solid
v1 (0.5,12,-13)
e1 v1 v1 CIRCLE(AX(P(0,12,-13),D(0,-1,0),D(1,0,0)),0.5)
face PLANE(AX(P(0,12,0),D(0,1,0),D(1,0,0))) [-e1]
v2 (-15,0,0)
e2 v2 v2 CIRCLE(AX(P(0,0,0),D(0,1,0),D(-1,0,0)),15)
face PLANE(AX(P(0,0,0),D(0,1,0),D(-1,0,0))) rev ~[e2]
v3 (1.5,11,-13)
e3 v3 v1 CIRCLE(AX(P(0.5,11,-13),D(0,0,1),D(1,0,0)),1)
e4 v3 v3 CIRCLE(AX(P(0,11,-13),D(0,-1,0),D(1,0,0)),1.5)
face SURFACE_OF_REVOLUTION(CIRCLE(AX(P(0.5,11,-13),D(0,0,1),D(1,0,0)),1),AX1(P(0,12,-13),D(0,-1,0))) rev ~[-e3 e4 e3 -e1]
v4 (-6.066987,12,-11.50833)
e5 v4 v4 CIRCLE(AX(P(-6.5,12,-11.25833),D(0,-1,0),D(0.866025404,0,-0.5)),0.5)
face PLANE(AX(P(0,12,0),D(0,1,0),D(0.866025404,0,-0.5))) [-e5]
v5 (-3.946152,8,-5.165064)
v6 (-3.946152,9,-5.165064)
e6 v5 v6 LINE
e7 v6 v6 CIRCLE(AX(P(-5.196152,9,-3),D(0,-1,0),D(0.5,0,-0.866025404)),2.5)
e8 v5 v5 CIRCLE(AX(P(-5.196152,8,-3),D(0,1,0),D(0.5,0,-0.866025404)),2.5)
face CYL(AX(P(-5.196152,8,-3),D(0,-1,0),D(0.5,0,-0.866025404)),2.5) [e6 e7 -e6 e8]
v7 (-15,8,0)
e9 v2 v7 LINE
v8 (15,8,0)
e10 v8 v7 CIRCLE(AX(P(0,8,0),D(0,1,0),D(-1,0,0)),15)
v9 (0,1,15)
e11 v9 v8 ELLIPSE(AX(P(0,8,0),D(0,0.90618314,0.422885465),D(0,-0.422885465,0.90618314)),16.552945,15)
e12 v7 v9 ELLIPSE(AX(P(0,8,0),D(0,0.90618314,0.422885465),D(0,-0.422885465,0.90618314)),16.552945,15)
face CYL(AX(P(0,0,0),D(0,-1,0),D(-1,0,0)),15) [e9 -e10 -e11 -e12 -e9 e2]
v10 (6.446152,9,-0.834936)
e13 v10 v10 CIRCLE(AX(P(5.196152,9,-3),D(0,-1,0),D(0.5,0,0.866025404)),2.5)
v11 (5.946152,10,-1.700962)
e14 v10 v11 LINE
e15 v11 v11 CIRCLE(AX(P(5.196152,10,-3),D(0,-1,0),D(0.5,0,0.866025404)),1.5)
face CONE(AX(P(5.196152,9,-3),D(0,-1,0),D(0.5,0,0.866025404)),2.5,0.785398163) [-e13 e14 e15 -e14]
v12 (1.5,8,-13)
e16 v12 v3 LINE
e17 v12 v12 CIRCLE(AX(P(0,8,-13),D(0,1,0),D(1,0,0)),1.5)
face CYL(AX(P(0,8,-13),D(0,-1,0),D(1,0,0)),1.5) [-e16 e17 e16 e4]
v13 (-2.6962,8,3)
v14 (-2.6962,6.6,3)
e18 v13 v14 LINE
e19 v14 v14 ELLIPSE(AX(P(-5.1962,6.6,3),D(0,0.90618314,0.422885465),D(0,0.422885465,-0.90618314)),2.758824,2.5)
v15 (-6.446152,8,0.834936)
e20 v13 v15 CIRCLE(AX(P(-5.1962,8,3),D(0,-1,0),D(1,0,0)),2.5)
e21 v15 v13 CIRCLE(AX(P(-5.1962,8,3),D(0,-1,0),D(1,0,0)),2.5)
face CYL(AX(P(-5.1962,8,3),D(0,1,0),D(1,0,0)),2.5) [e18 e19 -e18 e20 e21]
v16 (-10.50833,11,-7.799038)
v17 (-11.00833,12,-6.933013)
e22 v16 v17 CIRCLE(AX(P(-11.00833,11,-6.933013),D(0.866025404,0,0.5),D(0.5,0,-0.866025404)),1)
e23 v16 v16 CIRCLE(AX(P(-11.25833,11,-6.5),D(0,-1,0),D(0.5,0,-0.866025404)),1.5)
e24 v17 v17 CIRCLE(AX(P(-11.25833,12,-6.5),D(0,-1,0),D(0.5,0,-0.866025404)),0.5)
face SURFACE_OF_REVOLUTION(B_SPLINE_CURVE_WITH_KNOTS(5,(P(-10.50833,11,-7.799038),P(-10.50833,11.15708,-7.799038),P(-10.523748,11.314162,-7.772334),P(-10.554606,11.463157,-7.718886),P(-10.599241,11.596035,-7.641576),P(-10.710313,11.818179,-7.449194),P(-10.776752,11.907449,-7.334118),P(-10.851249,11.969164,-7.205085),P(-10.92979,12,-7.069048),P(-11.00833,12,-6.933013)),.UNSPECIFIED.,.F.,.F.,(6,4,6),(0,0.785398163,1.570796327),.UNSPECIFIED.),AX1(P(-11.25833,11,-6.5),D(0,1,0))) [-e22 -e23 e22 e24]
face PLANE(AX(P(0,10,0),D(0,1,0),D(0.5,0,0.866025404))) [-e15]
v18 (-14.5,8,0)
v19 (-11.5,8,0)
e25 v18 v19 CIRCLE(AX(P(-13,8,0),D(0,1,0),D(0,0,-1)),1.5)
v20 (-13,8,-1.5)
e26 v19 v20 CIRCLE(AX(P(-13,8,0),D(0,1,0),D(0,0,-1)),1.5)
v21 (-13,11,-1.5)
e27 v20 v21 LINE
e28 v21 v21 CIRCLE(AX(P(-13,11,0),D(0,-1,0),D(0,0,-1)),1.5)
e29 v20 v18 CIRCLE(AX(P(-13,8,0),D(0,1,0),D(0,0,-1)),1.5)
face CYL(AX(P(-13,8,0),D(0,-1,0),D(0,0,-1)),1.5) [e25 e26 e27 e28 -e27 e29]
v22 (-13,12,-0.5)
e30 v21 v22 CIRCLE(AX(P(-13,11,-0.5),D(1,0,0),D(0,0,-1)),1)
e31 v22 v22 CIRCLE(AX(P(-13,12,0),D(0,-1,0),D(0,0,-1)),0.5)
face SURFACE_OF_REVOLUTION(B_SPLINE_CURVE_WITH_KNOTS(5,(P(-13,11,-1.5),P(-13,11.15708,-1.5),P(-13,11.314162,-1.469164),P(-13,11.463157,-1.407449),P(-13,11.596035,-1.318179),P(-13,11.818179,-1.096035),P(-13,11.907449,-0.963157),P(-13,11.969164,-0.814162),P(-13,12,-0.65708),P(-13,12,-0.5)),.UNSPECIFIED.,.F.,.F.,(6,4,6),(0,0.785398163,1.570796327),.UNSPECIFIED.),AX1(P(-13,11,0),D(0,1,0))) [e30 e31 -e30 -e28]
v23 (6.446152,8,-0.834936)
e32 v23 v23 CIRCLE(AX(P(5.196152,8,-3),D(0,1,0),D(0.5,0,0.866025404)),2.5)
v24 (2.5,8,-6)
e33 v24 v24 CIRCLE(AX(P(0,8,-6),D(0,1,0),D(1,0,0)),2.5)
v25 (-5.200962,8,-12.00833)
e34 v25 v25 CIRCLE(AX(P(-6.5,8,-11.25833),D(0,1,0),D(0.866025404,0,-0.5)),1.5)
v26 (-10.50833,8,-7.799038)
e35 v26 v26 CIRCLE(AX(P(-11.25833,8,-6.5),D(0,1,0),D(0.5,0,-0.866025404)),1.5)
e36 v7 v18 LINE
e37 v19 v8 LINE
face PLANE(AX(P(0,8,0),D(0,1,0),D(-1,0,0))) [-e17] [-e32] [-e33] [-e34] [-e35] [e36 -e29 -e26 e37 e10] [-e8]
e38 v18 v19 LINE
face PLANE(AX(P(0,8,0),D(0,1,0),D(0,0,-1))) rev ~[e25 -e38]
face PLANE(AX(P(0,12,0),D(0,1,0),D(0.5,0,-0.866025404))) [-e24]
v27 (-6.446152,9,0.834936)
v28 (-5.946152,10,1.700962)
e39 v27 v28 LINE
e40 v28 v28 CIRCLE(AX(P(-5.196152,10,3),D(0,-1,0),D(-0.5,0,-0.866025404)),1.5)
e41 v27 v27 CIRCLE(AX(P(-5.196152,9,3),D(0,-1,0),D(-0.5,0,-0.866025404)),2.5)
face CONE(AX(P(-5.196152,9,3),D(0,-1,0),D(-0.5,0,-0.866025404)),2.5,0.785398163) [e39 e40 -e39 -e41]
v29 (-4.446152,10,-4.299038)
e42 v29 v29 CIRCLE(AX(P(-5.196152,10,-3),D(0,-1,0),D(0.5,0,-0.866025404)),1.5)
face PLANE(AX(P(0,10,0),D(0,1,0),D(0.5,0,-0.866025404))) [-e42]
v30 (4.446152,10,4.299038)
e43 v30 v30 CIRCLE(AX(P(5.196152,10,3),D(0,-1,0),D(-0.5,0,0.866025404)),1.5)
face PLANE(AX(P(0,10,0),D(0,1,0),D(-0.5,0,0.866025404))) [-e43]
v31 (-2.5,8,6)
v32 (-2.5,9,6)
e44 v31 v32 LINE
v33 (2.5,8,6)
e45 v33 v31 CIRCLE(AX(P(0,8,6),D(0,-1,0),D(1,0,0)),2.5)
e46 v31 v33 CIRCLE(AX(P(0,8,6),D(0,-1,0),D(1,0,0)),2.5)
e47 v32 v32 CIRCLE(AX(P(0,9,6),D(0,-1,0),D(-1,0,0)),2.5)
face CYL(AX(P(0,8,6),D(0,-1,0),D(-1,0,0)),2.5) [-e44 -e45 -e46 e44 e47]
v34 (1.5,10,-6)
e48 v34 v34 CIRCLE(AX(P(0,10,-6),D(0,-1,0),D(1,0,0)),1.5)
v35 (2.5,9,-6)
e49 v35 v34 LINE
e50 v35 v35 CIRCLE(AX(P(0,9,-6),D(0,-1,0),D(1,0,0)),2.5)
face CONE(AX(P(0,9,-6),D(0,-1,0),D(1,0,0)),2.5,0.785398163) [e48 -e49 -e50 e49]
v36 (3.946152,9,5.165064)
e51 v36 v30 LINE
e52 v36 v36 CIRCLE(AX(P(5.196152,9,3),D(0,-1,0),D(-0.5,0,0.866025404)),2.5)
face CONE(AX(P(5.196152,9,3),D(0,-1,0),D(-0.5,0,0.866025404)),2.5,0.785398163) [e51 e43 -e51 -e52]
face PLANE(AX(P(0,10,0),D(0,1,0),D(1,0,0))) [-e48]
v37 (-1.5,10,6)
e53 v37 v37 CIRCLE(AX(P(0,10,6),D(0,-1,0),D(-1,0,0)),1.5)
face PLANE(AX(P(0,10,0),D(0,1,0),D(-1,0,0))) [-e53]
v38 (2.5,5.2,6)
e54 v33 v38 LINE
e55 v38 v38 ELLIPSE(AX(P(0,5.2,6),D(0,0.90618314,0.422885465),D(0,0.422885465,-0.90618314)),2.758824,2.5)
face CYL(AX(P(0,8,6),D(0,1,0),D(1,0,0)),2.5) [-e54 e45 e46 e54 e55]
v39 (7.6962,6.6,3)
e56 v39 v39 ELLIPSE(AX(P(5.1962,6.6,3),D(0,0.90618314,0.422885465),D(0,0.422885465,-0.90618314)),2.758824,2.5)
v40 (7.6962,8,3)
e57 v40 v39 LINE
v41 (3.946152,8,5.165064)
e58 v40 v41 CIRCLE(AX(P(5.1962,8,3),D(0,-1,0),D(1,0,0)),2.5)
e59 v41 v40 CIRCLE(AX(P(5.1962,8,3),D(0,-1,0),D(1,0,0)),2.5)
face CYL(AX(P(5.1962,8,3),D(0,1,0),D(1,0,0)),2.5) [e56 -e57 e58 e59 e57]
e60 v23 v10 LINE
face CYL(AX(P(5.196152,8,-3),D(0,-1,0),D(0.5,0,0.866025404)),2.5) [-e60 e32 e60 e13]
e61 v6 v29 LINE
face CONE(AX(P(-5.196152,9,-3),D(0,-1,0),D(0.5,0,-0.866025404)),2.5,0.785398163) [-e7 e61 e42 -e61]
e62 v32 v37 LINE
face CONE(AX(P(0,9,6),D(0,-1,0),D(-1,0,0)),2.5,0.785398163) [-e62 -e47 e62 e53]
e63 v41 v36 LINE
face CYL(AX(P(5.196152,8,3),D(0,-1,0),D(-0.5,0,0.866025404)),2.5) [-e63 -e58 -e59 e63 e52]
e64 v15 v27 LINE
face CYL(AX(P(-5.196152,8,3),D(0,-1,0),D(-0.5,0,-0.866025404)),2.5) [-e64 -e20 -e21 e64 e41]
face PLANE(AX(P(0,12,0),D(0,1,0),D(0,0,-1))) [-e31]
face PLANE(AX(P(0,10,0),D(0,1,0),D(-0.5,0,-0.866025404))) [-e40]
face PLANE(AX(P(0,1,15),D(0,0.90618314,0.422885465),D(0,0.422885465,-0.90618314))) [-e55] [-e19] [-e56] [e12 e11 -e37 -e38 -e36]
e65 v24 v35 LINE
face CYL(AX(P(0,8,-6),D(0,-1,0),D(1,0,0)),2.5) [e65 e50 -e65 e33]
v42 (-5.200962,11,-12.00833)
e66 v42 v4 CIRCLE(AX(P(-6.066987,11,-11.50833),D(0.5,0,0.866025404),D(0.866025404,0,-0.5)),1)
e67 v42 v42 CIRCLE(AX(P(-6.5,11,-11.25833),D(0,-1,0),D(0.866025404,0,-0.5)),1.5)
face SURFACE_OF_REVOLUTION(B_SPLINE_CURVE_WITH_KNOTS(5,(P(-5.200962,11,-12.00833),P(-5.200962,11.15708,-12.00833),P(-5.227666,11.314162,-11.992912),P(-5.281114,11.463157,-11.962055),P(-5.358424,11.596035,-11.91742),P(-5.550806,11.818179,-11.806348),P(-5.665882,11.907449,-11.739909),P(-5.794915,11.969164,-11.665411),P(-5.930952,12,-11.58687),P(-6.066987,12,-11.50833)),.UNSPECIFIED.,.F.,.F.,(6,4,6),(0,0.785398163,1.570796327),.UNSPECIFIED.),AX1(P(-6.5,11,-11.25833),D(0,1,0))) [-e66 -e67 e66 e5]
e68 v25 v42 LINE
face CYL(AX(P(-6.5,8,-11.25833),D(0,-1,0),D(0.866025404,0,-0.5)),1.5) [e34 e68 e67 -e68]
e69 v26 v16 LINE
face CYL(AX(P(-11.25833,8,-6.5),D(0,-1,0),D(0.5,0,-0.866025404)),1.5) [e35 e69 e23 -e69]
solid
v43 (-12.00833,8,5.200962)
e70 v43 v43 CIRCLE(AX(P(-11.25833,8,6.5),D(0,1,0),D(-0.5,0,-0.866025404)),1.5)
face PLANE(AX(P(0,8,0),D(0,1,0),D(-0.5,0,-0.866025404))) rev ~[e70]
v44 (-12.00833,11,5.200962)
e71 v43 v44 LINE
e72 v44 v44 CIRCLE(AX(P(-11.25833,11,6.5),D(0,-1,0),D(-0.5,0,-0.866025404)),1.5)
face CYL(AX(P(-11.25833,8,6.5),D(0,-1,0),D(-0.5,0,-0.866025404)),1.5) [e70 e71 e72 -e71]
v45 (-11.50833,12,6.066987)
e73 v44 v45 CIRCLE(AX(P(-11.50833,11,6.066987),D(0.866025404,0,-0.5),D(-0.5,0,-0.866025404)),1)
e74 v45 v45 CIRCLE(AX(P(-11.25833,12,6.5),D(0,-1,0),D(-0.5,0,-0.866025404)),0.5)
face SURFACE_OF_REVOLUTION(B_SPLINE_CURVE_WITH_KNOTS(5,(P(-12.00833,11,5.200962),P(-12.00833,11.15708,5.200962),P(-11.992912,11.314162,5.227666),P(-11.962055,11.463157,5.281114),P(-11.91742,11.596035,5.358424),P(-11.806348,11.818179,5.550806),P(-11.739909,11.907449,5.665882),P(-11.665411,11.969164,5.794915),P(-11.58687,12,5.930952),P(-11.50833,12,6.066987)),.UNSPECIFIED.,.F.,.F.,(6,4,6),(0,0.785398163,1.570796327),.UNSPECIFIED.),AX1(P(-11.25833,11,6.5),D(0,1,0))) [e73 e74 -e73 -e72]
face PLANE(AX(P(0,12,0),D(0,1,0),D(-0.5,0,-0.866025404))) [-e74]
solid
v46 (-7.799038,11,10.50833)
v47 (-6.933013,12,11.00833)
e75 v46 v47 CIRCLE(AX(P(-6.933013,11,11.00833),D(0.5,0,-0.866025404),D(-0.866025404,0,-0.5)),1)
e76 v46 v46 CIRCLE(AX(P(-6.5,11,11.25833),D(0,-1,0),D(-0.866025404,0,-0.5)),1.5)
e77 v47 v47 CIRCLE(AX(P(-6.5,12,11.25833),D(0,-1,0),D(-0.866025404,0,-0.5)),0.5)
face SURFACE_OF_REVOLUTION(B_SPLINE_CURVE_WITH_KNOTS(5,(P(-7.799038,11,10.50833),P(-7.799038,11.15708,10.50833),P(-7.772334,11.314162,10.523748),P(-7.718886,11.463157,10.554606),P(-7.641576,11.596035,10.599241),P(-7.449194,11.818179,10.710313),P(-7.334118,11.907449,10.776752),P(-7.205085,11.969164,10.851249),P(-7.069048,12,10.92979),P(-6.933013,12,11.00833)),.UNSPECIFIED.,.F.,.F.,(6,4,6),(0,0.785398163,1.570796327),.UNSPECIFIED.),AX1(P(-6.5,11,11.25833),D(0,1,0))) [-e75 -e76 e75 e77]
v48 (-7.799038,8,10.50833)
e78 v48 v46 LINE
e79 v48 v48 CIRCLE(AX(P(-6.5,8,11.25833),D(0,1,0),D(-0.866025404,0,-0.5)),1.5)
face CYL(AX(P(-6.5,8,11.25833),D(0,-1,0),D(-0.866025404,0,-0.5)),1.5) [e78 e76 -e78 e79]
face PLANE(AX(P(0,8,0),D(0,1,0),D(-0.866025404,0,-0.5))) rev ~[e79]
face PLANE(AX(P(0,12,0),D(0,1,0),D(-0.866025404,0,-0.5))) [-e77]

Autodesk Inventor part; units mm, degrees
ref_plane "YZ Plane" through (0, 0, 0) normal (1, 0, 0) x (0, 1, 0)
ref_plane "XZ Plane" through (0, 0, 0) normal (0, 1, 0) x (-1, 0, 0)
ref_plane "XY Plane" through (0, 0, 0) normal (0, 0, 1) x (1, 0, 0)
sketch "草圖1" plane through (0, 0, 0) normal (0, 1, 0) x (-1, 0, 0)
  circle A0 centre (0, 0) radius 15
  dimension "d0" = 30
extrude "擠出1" add sketch "草圖1" along normal blind 8
sketch "草圖3" plane through (0, 0, 0) normal (1, 0, 0) x (0, 1, 0)
  line L0 (0, 15) -> (8, 15) projected
  line L1 (1, 15) -> (8, 0)
  line L2 (8, -15) -> (8, 15) projected
  line L3 (8, 0) -> (8, 15)
  line L4 (8, 15) -> (1, 15)
  line L5 (0, 15) -> (0, -15) projected
  point P0 (0, 0)
  dimension "d3" = 1
extrude "擠出2" cut sketch "草圖3" along normal mid plane 300
sketch "草圖4" plane through (0, 8, 0) normal (0, 1, 0) x (1, 0, 0)
  circle A0 centre (0, 0) radius 6 construction
  circle A1 centre (0, 6) radius 2.5
  line L0 (0, 0) -> (0, 9.7931)
  line L1 (-3.2998, 6) -> (3.1702, 6)
  dimension "d6" = 12
  dimension "d7" = 5
extrude "擠出3" add sketch "草圖4" along normal blind 2
chamfer "倒角1" distance 1 angle 45 1 edges at (-2.5, 10, -6) measured on face at (1.1976, 10, -6.694)
pattern_circular "環形陣列1" count 6 over 360 about axis through (0, 0, 0) along (0, -1, 0) of "擠出3", "倒角1"
sketch "草圖6" plane through (-5.1962, 8, 3) normal (0, -1, 0) x (1, 0, 0)
  circle A0 centre (0, 0) radius 2.5
  point P0 (5.1962, -3)
  dimension "d18" = 5
extrude "擠出5" add sketch "草圖6" along normal up to next
sketch "草圖8" plane through (0, 8, 6) normal (0, -1, 0) x (1, 0, 0)
  circle A0 centre (0, 0) radius 2.5
  point P0 (0, -6)
extrude "擠出6" add sketch "草圖8" along normal up to next
sketch "草圖9" plane through (5.1962, 8, 3) normal (0, -1, 0) x (1, 0, 0)
  circle A0 centre (0, 0) radius 2.5
  point P0 (-5.1962, -3)
extrude "擠出7" add sketch "草圖9" along normal up to next
sketch "草圖10" plane through (0, 8, 0) normal (0, 1, 0) x (1, 0, 0)
  circle A0 centre (0, 0) radius 13
  circle A1 centre (0, 13) radius 1.5
  line L0 (0, 13.5724) -> (0, 0)
  dimension "d25" = 26
  dimension "d26" = 3
extrude "擠出8" add sketch "草圖10" along normal blind 4 contours A1 L0 A0 | A0 A1 | A0 L0 A1 picked at (0.3336, 13.4681)
fillet "圓角1" radius 1 1 edges at (-1.5, 12, -13)
pattern_circular "環形陣列2" count 6 over 150 about axis through (0, 0, 0) along (0, 1, 0) of "圓角1", "擠出8"
properties part number "示範一"
